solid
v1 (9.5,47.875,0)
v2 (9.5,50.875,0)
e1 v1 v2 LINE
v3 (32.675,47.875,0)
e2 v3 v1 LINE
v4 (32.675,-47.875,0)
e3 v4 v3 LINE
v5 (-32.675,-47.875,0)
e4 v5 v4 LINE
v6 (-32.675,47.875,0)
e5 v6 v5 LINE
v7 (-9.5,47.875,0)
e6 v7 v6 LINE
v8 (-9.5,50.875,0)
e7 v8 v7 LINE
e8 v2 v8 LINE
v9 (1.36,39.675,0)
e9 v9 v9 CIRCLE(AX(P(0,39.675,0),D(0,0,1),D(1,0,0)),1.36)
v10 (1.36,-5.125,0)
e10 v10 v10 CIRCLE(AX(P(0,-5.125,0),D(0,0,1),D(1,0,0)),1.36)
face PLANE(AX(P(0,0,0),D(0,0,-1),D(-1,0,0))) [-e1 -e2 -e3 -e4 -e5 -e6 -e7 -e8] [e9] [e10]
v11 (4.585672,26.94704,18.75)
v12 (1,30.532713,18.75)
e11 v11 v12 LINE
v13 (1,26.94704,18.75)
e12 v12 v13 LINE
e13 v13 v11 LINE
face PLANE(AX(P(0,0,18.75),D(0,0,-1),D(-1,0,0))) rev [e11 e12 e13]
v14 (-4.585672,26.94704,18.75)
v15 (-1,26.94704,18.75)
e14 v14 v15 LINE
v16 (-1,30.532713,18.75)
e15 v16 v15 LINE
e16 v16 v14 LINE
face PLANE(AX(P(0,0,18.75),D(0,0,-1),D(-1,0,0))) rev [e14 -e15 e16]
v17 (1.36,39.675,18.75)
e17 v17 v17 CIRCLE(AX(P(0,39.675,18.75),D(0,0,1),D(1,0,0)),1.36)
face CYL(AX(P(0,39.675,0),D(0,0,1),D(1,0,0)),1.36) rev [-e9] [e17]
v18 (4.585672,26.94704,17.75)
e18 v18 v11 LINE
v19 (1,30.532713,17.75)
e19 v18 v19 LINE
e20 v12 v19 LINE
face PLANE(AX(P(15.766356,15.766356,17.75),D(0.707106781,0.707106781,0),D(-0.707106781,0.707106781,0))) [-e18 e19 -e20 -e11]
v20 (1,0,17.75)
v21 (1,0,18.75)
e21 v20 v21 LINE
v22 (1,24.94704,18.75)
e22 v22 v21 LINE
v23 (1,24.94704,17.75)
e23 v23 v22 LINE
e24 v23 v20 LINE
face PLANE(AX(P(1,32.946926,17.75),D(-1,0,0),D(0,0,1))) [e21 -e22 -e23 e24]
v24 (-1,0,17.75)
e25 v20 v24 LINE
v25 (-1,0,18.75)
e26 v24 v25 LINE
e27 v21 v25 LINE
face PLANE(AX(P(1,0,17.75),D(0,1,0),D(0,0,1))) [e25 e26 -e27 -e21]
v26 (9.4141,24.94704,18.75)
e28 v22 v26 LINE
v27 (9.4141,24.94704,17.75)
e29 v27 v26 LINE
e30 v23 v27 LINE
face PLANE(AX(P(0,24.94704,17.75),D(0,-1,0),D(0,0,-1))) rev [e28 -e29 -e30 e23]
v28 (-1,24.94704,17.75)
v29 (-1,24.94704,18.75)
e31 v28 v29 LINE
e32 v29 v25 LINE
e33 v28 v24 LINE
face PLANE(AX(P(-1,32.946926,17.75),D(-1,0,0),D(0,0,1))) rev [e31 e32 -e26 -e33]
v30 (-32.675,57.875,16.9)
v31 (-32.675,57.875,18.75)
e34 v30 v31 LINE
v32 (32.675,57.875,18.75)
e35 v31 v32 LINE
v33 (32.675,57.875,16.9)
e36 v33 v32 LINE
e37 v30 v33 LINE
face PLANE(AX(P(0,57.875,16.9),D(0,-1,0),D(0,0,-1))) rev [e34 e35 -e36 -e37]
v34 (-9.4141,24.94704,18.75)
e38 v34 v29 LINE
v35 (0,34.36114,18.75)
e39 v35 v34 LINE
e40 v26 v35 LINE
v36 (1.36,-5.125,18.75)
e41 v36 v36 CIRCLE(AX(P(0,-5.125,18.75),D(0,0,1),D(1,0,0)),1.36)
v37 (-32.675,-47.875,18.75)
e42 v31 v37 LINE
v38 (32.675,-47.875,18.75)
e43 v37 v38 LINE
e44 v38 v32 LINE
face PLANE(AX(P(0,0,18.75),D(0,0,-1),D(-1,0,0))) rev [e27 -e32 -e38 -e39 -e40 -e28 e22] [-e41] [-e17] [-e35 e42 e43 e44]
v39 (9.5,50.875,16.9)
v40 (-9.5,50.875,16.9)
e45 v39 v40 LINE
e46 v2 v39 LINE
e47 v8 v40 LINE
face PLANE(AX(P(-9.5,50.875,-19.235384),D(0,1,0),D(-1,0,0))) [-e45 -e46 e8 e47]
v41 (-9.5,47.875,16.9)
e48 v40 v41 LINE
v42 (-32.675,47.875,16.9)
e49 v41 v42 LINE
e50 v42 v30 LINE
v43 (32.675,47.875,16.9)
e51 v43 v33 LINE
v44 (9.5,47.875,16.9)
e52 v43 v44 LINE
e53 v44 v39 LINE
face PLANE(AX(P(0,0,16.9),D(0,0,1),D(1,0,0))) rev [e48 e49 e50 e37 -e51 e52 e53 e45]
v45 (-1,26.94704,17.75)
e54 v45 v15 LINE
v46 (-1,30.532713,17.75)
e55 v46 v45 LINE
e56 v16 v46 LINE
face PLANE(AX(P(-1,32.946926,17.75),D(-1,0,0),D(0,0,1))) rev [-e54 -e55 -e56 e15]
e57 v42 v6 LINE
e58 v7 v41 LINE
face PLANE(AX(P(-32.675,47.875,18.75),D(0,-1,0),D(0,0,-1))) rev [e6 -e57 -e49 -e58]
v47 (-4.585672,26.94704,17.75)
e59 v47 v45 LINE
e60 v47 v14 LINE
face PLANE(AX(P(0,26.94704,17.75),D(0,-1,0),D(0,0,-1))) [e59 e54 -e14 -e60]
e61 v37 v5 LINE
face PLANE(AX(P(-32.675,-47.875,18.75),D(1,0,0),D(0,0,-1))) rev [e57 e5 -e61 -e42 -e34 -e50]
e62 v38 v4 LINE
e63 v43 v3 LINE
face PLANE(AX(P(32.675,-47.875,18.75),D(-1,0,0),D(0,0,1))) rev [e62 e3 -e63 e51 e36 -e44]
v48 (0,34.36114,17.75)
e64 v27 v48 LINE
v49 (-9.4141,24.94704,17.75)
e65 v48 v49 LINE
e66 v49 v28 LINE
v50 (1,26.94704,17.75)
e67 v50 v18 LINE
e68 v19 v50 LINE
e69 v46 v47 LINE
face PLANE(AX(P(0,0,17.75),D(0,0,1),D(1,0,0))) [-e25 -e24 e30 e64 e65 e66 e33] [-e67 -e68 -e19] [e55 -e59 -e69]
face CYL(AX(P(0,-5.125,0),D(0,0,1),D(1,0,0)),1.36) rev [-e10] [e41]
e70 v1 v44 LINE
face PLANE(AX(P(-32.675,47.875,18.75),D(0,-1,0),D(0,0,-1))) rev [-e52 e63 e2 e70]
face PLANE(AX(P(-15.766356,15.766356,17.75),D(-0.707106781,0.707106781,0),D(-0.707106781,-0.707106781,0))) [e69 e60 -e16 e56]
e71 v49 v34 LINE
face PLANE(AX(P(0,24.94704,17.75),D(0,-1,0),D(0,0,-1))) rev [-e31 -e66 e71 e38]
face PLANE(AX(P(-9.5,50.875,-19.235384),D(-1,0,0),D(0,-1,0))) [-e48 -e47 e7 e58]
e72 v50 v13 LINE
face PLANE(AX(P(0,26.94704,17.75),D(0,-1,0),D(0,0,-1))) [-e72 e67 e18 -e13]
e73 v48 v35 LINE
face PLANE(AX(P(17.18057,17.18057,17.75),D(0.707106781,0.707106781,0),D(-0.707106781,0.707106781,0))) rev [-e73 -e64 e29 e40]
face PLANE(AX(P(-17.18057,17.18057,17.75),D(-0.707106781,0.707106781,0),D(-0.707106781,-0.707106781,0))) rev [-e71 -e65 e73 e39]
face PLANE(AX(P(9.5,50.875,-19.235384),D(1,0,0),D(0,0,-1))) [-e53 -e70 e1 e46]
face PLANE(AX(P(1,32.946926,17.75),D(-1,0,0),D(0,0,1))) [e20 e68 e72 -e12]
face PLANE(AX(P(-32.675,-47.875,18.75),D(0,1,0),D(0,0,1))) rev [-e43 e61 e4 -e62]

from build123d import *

# Parameters (mm, degrees)
SKETCH1_W               = 65.35
SKETCH1_H               = 95.75
BOSS_EXTRUDE1_DEPTH     = 18.75
SKETCH2_R               = 1.36
CUT_EXTRUDE1_DEPTH      = 61.919896175
CUT_EXTRUDE_THIN1_START = -1
CUT_EXTRUDE_THIN1_DEPTH = 1
SKETCH5_W               = 19
SKETCH5_H               = 3
BOSS_EXTRUDE2_DEPTH     = 18.75
BOSS_EXTRUDE3_DEPTH     = 1.85


# Read off the part's stored shape, not the designer's step: Cut-Extrude-Thin1
with BuildPart() as part:
    # Sketch1 → Boss-Extrude1 (new body)
    with BuildSketch(Plane.XY):
        Rectangle(SKETCH1_W, SKETCH1_H)
    extrude(amount=BOSS_EXTRUDE1_DEPTH)

    # Sketch2 → Cut-Extrude1 (cut, through all)
    with BuildSketch(Plane.XY.offset(18.75)):
        with Locations((0, 39.675)):
            Circle(SKETCH2_R)
        with Locations((0, -5.125)):
            Circle(SKETCH2_R)
    extrude(amount=-CUT_EXTRUDE1_DEPTH, mode=Mode.SUBTRACT)

    # Cut-Extrude-Thin1 outline → Cut-Extrude-Thin1 (cut)
    with BuildSketch(Plane.XY.offset(18.75).offset(CUT_EXTRUDE_THIN1_START)):
        Polygon((1, 0), (1, 24.947040452), (9.414099592, 24.947040452), (0, 34.361140044), (-9.414099592, 24.947040452), (-1, 24.947040452), (-1, 0), align=None)
        Polygon((-4.585672467, 26.947040452), (-1, 30.532712919), (-1, 26.947040452), align=None, mode=Mode.SUBTRACT)
        Polygon((1, 26.947040452), (1, 30.532712919), (4.585672467, 26.947040452), align=None, mode=Mode.SUBTRACT)
    extrude(amount=CUT_EXTRUDE_THIN1_DEPTH, mode=Mode.SUBTRACT)

    # Sketch5 → Boss-Extrude2 (add)
    with BuildSketch(Plane.XY.offset(18.75)):
        with Locations((0, 49.375)):
            Rectangle(SKETCH5_W, SKETCH5_H)
    extrude(amount=-BOSS_EXTRUDE2_DEPTH)

    # Sketch6 → Boss-Extrude3 (add)
    with BuildSketch(Plane.XY.offset(18.75)):
        Polygon((-32.675, 57.875), (32.675, 57.875), (32.675, 47.875), (9.5, 47.875), (9.5, 50.875), (-9.5, 50.875), (-9.5, 47.875), (-32.675, 47.875), align=None)
    extrude(amount=-BOSS_EXTRUDE3_DEPTH)


solid = part.part
